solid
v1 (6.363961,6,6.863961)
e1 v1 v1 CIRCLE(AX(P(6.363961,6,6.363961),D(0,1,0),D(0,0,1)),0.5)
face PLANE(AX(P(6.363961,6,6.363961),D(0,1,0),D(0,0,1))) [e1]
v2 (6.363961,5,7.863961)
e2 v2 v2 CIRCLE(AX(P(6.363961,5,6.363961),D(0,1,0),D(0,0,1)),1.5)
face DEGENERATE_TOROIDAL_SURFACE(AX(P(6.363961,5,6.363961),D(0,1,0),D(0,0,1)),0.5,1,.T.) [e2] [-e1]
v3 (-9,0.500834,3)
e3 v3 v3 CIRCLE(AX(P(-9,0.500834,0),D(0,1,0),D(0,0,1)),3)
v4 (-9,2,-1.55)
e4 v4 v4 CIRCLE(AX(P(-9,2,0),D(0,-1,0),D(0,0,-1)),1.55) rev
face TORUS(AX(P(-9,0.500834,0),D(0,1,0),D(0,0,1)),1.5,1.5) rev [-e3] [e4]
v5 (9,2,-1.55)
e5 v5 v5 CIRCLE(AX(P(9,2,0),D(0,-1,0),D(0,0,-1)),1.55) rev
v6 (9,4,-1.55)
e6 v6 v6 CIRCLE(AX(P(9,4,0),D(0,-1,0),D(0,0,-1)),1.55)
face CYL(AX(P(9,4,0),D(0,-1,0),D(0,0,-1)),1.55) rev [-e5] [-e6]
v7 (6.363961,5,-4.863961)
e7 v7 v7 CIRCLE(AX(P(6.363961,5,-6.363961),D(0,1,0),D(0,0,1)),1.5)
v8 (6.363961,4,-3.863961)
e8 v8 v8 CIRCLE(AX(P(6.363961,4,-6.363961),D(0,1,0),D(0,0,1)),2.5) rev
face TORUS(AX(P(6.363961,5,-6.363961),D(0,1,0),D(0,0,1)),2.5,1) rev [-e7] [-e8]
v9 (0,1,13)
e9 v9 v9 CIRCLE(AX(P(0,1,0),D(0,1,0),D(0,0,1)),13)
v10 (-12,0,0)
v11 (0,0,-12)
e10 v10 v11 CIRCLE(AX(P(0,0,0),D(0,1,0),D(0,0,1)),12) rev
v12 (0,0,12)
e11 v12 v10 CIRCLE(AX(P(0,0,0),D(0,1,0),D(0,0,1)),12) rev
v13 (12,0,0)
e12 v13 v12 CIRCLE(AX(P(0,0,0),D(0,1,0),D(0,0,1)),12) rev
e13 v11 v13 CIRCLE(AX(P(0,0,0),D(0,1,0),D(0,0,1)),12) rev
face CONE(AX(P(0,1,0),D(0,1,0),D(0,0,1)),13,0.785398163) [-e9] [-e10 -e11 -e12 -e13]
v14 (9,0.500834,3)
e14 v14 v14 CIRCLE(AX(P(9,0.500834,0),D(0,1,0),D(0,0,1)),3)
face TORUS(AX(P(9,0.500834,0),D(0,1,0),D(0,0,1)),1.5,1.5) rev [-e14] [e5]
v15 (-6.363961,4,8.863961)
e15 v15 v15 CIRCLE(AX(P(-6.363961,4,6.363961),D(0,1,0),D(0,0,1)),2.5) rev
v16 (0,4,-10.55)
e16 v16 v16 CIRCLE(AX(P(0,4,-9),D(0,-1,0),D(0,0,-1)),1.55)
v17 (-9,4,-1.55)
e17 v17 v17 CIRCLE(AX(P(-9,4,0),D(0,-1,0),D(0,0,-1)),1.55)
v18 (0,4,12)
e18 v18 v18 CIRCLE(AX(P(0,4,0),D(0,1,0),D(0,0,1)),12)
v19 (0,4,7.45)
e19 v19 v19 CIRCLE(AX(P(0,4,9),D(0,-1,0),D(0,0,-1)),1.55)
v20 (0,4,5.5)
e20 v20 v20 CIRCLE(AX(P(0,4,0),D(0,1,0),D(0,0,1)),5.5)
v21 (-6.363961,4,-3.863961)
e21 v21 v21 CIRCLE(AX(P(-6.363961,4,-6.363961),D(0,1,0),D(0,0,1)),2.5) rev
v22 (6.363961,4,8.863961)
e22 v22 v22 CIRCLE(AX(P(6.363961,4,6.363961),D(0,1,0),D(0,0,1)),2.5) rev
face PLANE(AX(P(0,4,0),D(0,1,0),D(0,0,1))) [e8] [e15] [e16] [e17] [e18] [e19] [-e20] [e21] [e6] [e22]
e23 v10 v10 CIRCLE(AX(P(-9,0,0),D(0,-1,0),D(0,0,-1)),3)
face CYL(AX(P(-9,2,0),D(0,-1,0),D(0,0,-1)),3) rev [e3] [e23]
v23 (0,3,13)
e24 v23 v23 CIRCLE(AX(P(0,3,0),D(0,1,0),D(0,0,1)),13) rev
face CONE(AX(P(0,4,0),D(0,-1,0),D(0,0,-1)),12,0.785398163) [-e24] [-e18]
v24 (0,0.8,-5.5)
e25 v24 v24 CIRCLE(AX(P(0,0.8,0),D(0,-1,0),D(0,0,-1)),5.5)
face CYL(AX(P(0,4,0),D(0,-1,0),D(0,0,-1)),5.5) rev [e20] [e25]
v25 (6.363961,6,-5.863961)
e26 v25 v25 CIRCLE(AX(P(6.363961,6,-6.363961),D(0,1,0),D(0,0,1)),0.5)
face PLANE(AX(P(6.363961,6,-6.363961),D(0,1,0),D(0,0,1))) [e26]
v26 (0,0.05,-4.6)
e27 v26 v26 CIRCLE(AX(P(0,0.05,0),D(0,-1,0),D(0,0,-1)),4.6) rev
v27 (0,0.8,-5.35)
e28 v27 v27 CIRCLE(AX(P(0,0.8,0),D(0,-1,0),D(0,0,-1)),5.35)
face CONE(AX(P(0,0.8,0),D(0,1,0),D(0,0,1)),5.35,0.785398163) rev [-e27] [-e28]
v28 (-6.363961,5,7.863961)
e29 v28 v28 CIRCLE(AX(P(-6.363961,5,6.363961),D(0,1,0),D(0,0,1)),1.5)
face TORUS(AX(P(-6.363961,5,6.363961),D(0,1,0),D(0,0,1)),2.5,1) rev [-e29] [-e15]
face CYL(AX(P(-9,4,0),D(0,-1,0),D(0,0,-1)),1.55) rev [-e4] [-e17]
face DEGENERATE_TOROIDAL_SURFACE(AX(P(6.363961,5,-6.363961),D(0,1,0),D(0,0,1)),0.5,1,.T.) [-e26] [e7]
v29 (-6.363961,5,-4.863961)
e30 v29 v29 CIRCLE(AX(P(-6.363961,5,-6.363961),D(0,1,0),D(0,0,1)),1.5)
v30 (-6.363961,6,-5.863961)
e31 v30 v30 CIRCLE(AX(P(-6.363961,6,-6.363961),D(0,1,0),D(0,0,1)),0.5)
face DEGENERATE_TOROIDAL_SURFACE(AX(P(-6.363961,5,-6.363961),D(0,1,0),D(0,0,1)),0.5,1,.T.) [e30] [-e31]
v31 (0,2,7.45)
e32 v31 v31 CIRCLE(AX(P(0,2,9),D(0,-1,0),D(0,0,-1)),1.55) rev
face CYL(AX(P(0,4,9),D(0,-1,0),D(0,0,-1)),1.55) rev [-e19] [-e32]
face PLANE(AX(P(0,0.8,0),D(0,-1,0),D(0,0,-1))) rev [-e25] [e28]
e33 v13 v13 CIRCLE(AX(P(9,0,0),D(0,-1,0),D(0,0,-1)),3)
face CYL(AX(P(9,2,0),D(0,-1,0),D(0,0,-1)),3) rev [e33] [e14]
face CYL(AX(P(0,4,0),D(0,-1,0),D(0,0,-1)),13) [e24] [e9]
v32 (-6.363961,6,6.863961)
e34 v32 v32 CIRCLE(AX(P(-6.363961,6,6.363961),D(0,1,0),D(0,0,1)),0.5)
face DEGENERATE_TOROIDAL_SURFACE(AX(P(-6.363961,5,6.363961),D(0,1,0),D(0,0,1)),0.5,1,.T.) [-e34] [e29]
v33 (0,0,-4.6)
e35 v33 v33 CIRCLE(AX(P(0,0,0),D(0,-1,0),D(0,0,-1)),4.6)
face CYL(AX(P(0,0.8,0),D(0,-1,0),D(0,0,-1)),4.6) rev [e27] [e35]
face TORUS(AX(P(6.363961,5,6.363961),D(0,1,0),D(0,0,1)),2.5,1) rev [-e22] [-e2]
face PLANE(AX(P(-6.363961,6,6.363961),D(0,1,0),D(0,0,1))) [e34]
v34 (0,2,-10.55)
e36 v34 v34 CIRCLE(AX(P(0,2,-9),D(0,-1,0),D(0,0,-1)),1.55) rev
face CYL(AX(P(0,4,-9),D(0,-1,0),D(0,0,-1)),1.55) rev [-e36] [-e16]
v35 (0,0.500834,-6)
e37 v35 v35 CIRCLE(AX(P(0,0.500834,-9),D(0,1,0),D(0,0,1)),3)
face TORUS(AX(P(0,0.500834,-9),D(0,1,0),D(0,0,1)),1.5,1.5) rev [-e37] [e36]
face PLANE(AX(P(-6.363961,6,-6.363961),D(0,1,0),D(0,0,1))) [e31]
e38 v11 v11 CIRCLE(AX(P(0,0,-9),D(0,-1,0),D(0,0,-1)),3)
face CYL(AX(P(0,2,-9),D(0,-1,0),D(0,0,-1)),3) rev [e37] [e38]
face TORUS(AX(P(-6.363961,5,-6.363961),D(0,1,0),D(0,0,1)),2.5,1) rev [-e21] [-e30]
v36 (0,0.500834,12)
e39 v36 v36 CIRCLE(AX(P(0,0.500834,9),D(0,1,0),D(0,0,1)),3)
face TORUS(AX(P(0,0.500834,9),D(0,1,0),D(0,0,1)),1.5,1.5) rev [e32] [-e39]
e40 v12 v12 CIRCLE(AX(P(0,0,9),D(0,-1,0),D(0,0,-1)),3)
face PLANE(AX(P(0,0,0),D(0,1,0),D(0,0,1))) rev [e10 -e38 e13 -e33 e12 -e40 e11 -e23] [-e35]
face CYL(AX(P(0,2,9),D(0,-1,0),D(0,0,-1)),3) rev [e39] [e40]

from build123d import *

# Parameters (mm, degrees)
SKETCH1_R           = 13
SKETCH1_R_2         = 5.5
BOSS_EXTRUDE1_DEPTH = 4
SKETCH2_R           = 1.55
CUT_EXTRUDE1_DEPTH  = 19.814887722
SKETCH3_R           = 3
CUT_EXTRUDE2_DEPTH  = 2
FILLET1_R           = 1.5
CHAMFER1_SIZE       = 1
CHAMFER2_SIZE       = 1
SKETCH4_R           = 1.5
BOSS_EXTRUDE2_DEPTH = 2
FILLET2_R           = 1
SKETCH5_R           = 5.5
SKETCH5_R_2         = 4.6
BOSS_EXTRUDE3_DEPTH = 0.8
CHAMFER3_SIZE       = 0.75


# Some blends are built 0.0001 mm under size
with BuildPart() as part:
    # Sketch1 → Boss-Extrude1 (new body)
    with BuildSketch(Plane(origin=(0, 0, 0), x_dir=(1, 0, 0), z_dir=(0, 1, 0))):
        with Locations(Location((0, 0, 0), (0, 0, 270))):
            Circle(SKETCH1_R)
        with Locations(Location((0, 0, 0), (0, 0, 270))):
            Circle(SKETCH1_R_2, mode=Mode.SUBTRACT)
    extrude(amount=BOSS_EXTRUDE1_DEPTH)

    # Sketch2 → Cut-Extrude1 (cut, through all)
    with BuildSketch(Plane.XZ):
        with Locations(Location((0, 9, 0), (0, 0, 270))):
            Circle(SKETCH2_R)
        with Locations(Location((9, 0, 0), (0, 0, 270))):
            Circle(SKETCH2_R)
        with Locations(Location((0, -9, 0), (0, 0, 270))):
            Circle(SKETCH2_R)
        with Locations(Location((-9, 0, 0), (0, 0, 270))):
            Circle(SKETCH2_R)
    extrude(amount=-CUT_EXTRUDE1_DEPTH, mode=Mode.SUBTRACT)

    # Sketch3 → Cut-Extrude2 (cut)
    with BuildSketch(Plane.XZ):
        with Locations(Location((0, 9, 0), (0, 0, 270))):
            Circle(SKETCH3_R)
        with Locations(Location((9, 0, 0), (0, 0, 270))):
            Circle(SKETCH3_R)
        with Locations(Location((0, -9, 0), (0, 0, 270))):
            Circle(SKETCH3_R)
        with Locations(Location((-9, 0, 0), (0, 0, 270))):
            Circle(SKETCH3_R)
    extrude(amount=-CUT_EXTRUDE2_DEPTH, mode=Mode.SUBTRACT)

    # Fillet1
    # the kernel refuses this fillet: 1.5 mm, written as the material it adds along each edge
    with BuildSketch(Plane(origin=(0, 2, 9), x_dir=(0, 0, -1), z_dir=(-1, 0, 0))) as fillet1_piece_1_section:
        with BuildLine():
            CenterArc((3 - FILLET1_R, FILLET1_R), FILLET1_R, 270, 90)
            Line((3 - FILLET1_R, 0), (3, 0))
            Line((3, 0), (3, FILLET1_R))
        make_face()
    fillet1_piece_1 = revolve(axis=Axis((0, 2, 9), (0, -1, 0)), mode=Mode.PRIVATE)
    fillet1_piece_1 = fillet1_piece_1 - Plane(origin=(0, 1.557596164, 9), x_dir=(0, 0, -1), z_dir=(0, -1, 0)) * Cylinder(1.55, 12, mode=Mode.PRIVATE)
    add(fillet1_piece_1)
    with BuildSketch(Plane(origin=(9, 2, 0), x_dir=(0, 0, -1), z_dir=(-1, 0, 0))) as fillet1_piece_2_section:
        with BuildLine():
            CenterArc((3 - FILLET1_R, FILLET1_R), FILLET1_R, 270, 90)
            Line((3 - FILLET1_R, 0), (3, 0))
            Line((3, 0), (3, FILLET1_R))
        make_face()
    fillet1_piece_2 = revolve(axis=Axis((9, 2, 0), (0, -1, 0)), mode=Mode.PRIVATE)
    fillet1_piece_2 = fillet1_piece_2 - Plane(origin=(9, 1.557596164, 0), x_dir=(0, 0, -1), z_dir=(0, -1, 0)) * Cylinder(1.55, 13, mode=Mode.PRIVATE)
    add(fillet1_piece_2)
    with BuildSketch(Plane(origin=(0, 2, -9), x_dir=(0, 0, -1), z_dir=(-1, 0, 0))) as fillet1_piece_3_section:
        with BuildLine():
            CenterArc((3 - FILLET1_R, FILLET1_R), FILLET1_R, 270, 90)
            Line((3 - FILLET1_R, 0), (3, 0))
            Line((3, 0), (3, FILLET1_R))
        make_face()
    fillet1_piece_3 = revolve(axis=Axis((0, 2, -9), (0, -1, 0)), mode=Mode.PRIVATE)
    fillet1_piece_3 = fillet1_piece_3 - Plane(origin=(0, 1.557596164, -9), x_dir=(0, 0, -1), z_dir=(0, -1, 0)) * Cylinder(1.55, 12, mode=Mode.PRIVATE)
    add(fillet1_piece_3)
    with BuildSketch(Plane(origin=(-9, 2, 0), x_dir=(0, 0, -1), z_dir=(-1, 0, 0))) as fillet1_piece_4_section:
        with BuildLine():
            CenterArc((3 - FILLET1_R, FILLET1_R), FILLET1_R, 270, 90)
            Line((3 - FILLET1_R, 0), (3, 0))
            Line((3, 0), (3, FILLET1_R))
        make_face()
    fillet1_piece_4 = revolve(axis=Axis((-9, 2, 0), (0, -1, 0)), mode=Mode.PRIVATE)
    fillet1_piece_4 = fillet1_piece_4 - Plane(origin=(-9, 1.557596164, 0), x_dir=(0, 0, -1), z_dir=(0, -1, 0)) * Cylinder(1.55, 12, mode=Mode.PRIVATE)
    add(fillet1_piece_4)

    # Chamfer1
    chamfer1_edges = [part.edges().sort_by_distance(p)[0] for p in [
        (0, 4, -13),
    ]]
    chamfer(chamfer1_edges, length=CHAMFER1_SIZE)

    # Chamfer2
    chamfer2_edges = [part.edges().sort_by_distance(p)[0] for p in [
        (0, 0, -13),
    ]]
    chamfer(chamfer2_edges, length=CHAMFER2_SIZE - 0.0001)  # a hair under: the kernel refuses the full size

    # Sketch4 → Boss-Extrude2 (add)
    with BuildSketch(Plane(origin=(0, 4, 0), x_dir=(1, 0, 0), z_dir=(0, 1, 0))):
        with Locations(Location((6.363961031, 6.363961031, 0), (0, 0, 270))):
            Circle(SKETCH4_R)
        with Locations(Location((6.363961031, -6.363961031, 0), (0, 0, 270))):
            Circle(SKETCH4_R)
        with Locations(Location((-6.363961031, -6.363961031, 0), (0, 0, 270))):
            Circle(SKETCH4_R)
        with Locations(Location((-6.363961031, 6.363961031, 0), (0, 0, 270))):
            Circle(SKETCH4_R)
    extrude(amount=BOSS_EXTRUDE2_DEPTH)

    # Fillet2
    fillet2_edges = [part.edges().sort_by_distance(p)[0] for p in [
        (6.363961031, 4, -7.863961031),
        (6.363961031, 6, -7.863961031),
        (6.363961031, 4, 4.863961031),
        (6.363961031, 6, 4.863961031),
        (-6.363961031, 4, 4.863961031),
        (-6.363961031, 6, 4.863961031),
        (-6.363961031, 4, -7.863961031),
        (-6.363961031, 6, -7.863961031),
    ]]
    fillet(fillet2_edges, radius=FILLET2_R - 0.0001)  # a hair under: the kernel refuses the full size

    # Sketch5 → Boss-Extrude3 (add)
    with BuildSketch(Plane.XZ):
        with Locations(Location((0, 0, 0), (0, 0, 270))):
            Circle(SKETCH5_R)
        with Locations(Location((0, 0, 0), (0, 0, 270))):
            Circle(SKETCH5_R_2, mode=Mode.SUBTRACT)
    extrude(amount=-BOSS_EXTRUDE3_DEPTH)

    # Chamfer3
    chamfer3_edges = [part.edges().sort_by_distance(p)[0] for p in [
        (0, 0.8, 4.6),
    ]]
    chamfer(chamfer3_edges, length=CHAMFER3_SIZE)


solid = part.part
